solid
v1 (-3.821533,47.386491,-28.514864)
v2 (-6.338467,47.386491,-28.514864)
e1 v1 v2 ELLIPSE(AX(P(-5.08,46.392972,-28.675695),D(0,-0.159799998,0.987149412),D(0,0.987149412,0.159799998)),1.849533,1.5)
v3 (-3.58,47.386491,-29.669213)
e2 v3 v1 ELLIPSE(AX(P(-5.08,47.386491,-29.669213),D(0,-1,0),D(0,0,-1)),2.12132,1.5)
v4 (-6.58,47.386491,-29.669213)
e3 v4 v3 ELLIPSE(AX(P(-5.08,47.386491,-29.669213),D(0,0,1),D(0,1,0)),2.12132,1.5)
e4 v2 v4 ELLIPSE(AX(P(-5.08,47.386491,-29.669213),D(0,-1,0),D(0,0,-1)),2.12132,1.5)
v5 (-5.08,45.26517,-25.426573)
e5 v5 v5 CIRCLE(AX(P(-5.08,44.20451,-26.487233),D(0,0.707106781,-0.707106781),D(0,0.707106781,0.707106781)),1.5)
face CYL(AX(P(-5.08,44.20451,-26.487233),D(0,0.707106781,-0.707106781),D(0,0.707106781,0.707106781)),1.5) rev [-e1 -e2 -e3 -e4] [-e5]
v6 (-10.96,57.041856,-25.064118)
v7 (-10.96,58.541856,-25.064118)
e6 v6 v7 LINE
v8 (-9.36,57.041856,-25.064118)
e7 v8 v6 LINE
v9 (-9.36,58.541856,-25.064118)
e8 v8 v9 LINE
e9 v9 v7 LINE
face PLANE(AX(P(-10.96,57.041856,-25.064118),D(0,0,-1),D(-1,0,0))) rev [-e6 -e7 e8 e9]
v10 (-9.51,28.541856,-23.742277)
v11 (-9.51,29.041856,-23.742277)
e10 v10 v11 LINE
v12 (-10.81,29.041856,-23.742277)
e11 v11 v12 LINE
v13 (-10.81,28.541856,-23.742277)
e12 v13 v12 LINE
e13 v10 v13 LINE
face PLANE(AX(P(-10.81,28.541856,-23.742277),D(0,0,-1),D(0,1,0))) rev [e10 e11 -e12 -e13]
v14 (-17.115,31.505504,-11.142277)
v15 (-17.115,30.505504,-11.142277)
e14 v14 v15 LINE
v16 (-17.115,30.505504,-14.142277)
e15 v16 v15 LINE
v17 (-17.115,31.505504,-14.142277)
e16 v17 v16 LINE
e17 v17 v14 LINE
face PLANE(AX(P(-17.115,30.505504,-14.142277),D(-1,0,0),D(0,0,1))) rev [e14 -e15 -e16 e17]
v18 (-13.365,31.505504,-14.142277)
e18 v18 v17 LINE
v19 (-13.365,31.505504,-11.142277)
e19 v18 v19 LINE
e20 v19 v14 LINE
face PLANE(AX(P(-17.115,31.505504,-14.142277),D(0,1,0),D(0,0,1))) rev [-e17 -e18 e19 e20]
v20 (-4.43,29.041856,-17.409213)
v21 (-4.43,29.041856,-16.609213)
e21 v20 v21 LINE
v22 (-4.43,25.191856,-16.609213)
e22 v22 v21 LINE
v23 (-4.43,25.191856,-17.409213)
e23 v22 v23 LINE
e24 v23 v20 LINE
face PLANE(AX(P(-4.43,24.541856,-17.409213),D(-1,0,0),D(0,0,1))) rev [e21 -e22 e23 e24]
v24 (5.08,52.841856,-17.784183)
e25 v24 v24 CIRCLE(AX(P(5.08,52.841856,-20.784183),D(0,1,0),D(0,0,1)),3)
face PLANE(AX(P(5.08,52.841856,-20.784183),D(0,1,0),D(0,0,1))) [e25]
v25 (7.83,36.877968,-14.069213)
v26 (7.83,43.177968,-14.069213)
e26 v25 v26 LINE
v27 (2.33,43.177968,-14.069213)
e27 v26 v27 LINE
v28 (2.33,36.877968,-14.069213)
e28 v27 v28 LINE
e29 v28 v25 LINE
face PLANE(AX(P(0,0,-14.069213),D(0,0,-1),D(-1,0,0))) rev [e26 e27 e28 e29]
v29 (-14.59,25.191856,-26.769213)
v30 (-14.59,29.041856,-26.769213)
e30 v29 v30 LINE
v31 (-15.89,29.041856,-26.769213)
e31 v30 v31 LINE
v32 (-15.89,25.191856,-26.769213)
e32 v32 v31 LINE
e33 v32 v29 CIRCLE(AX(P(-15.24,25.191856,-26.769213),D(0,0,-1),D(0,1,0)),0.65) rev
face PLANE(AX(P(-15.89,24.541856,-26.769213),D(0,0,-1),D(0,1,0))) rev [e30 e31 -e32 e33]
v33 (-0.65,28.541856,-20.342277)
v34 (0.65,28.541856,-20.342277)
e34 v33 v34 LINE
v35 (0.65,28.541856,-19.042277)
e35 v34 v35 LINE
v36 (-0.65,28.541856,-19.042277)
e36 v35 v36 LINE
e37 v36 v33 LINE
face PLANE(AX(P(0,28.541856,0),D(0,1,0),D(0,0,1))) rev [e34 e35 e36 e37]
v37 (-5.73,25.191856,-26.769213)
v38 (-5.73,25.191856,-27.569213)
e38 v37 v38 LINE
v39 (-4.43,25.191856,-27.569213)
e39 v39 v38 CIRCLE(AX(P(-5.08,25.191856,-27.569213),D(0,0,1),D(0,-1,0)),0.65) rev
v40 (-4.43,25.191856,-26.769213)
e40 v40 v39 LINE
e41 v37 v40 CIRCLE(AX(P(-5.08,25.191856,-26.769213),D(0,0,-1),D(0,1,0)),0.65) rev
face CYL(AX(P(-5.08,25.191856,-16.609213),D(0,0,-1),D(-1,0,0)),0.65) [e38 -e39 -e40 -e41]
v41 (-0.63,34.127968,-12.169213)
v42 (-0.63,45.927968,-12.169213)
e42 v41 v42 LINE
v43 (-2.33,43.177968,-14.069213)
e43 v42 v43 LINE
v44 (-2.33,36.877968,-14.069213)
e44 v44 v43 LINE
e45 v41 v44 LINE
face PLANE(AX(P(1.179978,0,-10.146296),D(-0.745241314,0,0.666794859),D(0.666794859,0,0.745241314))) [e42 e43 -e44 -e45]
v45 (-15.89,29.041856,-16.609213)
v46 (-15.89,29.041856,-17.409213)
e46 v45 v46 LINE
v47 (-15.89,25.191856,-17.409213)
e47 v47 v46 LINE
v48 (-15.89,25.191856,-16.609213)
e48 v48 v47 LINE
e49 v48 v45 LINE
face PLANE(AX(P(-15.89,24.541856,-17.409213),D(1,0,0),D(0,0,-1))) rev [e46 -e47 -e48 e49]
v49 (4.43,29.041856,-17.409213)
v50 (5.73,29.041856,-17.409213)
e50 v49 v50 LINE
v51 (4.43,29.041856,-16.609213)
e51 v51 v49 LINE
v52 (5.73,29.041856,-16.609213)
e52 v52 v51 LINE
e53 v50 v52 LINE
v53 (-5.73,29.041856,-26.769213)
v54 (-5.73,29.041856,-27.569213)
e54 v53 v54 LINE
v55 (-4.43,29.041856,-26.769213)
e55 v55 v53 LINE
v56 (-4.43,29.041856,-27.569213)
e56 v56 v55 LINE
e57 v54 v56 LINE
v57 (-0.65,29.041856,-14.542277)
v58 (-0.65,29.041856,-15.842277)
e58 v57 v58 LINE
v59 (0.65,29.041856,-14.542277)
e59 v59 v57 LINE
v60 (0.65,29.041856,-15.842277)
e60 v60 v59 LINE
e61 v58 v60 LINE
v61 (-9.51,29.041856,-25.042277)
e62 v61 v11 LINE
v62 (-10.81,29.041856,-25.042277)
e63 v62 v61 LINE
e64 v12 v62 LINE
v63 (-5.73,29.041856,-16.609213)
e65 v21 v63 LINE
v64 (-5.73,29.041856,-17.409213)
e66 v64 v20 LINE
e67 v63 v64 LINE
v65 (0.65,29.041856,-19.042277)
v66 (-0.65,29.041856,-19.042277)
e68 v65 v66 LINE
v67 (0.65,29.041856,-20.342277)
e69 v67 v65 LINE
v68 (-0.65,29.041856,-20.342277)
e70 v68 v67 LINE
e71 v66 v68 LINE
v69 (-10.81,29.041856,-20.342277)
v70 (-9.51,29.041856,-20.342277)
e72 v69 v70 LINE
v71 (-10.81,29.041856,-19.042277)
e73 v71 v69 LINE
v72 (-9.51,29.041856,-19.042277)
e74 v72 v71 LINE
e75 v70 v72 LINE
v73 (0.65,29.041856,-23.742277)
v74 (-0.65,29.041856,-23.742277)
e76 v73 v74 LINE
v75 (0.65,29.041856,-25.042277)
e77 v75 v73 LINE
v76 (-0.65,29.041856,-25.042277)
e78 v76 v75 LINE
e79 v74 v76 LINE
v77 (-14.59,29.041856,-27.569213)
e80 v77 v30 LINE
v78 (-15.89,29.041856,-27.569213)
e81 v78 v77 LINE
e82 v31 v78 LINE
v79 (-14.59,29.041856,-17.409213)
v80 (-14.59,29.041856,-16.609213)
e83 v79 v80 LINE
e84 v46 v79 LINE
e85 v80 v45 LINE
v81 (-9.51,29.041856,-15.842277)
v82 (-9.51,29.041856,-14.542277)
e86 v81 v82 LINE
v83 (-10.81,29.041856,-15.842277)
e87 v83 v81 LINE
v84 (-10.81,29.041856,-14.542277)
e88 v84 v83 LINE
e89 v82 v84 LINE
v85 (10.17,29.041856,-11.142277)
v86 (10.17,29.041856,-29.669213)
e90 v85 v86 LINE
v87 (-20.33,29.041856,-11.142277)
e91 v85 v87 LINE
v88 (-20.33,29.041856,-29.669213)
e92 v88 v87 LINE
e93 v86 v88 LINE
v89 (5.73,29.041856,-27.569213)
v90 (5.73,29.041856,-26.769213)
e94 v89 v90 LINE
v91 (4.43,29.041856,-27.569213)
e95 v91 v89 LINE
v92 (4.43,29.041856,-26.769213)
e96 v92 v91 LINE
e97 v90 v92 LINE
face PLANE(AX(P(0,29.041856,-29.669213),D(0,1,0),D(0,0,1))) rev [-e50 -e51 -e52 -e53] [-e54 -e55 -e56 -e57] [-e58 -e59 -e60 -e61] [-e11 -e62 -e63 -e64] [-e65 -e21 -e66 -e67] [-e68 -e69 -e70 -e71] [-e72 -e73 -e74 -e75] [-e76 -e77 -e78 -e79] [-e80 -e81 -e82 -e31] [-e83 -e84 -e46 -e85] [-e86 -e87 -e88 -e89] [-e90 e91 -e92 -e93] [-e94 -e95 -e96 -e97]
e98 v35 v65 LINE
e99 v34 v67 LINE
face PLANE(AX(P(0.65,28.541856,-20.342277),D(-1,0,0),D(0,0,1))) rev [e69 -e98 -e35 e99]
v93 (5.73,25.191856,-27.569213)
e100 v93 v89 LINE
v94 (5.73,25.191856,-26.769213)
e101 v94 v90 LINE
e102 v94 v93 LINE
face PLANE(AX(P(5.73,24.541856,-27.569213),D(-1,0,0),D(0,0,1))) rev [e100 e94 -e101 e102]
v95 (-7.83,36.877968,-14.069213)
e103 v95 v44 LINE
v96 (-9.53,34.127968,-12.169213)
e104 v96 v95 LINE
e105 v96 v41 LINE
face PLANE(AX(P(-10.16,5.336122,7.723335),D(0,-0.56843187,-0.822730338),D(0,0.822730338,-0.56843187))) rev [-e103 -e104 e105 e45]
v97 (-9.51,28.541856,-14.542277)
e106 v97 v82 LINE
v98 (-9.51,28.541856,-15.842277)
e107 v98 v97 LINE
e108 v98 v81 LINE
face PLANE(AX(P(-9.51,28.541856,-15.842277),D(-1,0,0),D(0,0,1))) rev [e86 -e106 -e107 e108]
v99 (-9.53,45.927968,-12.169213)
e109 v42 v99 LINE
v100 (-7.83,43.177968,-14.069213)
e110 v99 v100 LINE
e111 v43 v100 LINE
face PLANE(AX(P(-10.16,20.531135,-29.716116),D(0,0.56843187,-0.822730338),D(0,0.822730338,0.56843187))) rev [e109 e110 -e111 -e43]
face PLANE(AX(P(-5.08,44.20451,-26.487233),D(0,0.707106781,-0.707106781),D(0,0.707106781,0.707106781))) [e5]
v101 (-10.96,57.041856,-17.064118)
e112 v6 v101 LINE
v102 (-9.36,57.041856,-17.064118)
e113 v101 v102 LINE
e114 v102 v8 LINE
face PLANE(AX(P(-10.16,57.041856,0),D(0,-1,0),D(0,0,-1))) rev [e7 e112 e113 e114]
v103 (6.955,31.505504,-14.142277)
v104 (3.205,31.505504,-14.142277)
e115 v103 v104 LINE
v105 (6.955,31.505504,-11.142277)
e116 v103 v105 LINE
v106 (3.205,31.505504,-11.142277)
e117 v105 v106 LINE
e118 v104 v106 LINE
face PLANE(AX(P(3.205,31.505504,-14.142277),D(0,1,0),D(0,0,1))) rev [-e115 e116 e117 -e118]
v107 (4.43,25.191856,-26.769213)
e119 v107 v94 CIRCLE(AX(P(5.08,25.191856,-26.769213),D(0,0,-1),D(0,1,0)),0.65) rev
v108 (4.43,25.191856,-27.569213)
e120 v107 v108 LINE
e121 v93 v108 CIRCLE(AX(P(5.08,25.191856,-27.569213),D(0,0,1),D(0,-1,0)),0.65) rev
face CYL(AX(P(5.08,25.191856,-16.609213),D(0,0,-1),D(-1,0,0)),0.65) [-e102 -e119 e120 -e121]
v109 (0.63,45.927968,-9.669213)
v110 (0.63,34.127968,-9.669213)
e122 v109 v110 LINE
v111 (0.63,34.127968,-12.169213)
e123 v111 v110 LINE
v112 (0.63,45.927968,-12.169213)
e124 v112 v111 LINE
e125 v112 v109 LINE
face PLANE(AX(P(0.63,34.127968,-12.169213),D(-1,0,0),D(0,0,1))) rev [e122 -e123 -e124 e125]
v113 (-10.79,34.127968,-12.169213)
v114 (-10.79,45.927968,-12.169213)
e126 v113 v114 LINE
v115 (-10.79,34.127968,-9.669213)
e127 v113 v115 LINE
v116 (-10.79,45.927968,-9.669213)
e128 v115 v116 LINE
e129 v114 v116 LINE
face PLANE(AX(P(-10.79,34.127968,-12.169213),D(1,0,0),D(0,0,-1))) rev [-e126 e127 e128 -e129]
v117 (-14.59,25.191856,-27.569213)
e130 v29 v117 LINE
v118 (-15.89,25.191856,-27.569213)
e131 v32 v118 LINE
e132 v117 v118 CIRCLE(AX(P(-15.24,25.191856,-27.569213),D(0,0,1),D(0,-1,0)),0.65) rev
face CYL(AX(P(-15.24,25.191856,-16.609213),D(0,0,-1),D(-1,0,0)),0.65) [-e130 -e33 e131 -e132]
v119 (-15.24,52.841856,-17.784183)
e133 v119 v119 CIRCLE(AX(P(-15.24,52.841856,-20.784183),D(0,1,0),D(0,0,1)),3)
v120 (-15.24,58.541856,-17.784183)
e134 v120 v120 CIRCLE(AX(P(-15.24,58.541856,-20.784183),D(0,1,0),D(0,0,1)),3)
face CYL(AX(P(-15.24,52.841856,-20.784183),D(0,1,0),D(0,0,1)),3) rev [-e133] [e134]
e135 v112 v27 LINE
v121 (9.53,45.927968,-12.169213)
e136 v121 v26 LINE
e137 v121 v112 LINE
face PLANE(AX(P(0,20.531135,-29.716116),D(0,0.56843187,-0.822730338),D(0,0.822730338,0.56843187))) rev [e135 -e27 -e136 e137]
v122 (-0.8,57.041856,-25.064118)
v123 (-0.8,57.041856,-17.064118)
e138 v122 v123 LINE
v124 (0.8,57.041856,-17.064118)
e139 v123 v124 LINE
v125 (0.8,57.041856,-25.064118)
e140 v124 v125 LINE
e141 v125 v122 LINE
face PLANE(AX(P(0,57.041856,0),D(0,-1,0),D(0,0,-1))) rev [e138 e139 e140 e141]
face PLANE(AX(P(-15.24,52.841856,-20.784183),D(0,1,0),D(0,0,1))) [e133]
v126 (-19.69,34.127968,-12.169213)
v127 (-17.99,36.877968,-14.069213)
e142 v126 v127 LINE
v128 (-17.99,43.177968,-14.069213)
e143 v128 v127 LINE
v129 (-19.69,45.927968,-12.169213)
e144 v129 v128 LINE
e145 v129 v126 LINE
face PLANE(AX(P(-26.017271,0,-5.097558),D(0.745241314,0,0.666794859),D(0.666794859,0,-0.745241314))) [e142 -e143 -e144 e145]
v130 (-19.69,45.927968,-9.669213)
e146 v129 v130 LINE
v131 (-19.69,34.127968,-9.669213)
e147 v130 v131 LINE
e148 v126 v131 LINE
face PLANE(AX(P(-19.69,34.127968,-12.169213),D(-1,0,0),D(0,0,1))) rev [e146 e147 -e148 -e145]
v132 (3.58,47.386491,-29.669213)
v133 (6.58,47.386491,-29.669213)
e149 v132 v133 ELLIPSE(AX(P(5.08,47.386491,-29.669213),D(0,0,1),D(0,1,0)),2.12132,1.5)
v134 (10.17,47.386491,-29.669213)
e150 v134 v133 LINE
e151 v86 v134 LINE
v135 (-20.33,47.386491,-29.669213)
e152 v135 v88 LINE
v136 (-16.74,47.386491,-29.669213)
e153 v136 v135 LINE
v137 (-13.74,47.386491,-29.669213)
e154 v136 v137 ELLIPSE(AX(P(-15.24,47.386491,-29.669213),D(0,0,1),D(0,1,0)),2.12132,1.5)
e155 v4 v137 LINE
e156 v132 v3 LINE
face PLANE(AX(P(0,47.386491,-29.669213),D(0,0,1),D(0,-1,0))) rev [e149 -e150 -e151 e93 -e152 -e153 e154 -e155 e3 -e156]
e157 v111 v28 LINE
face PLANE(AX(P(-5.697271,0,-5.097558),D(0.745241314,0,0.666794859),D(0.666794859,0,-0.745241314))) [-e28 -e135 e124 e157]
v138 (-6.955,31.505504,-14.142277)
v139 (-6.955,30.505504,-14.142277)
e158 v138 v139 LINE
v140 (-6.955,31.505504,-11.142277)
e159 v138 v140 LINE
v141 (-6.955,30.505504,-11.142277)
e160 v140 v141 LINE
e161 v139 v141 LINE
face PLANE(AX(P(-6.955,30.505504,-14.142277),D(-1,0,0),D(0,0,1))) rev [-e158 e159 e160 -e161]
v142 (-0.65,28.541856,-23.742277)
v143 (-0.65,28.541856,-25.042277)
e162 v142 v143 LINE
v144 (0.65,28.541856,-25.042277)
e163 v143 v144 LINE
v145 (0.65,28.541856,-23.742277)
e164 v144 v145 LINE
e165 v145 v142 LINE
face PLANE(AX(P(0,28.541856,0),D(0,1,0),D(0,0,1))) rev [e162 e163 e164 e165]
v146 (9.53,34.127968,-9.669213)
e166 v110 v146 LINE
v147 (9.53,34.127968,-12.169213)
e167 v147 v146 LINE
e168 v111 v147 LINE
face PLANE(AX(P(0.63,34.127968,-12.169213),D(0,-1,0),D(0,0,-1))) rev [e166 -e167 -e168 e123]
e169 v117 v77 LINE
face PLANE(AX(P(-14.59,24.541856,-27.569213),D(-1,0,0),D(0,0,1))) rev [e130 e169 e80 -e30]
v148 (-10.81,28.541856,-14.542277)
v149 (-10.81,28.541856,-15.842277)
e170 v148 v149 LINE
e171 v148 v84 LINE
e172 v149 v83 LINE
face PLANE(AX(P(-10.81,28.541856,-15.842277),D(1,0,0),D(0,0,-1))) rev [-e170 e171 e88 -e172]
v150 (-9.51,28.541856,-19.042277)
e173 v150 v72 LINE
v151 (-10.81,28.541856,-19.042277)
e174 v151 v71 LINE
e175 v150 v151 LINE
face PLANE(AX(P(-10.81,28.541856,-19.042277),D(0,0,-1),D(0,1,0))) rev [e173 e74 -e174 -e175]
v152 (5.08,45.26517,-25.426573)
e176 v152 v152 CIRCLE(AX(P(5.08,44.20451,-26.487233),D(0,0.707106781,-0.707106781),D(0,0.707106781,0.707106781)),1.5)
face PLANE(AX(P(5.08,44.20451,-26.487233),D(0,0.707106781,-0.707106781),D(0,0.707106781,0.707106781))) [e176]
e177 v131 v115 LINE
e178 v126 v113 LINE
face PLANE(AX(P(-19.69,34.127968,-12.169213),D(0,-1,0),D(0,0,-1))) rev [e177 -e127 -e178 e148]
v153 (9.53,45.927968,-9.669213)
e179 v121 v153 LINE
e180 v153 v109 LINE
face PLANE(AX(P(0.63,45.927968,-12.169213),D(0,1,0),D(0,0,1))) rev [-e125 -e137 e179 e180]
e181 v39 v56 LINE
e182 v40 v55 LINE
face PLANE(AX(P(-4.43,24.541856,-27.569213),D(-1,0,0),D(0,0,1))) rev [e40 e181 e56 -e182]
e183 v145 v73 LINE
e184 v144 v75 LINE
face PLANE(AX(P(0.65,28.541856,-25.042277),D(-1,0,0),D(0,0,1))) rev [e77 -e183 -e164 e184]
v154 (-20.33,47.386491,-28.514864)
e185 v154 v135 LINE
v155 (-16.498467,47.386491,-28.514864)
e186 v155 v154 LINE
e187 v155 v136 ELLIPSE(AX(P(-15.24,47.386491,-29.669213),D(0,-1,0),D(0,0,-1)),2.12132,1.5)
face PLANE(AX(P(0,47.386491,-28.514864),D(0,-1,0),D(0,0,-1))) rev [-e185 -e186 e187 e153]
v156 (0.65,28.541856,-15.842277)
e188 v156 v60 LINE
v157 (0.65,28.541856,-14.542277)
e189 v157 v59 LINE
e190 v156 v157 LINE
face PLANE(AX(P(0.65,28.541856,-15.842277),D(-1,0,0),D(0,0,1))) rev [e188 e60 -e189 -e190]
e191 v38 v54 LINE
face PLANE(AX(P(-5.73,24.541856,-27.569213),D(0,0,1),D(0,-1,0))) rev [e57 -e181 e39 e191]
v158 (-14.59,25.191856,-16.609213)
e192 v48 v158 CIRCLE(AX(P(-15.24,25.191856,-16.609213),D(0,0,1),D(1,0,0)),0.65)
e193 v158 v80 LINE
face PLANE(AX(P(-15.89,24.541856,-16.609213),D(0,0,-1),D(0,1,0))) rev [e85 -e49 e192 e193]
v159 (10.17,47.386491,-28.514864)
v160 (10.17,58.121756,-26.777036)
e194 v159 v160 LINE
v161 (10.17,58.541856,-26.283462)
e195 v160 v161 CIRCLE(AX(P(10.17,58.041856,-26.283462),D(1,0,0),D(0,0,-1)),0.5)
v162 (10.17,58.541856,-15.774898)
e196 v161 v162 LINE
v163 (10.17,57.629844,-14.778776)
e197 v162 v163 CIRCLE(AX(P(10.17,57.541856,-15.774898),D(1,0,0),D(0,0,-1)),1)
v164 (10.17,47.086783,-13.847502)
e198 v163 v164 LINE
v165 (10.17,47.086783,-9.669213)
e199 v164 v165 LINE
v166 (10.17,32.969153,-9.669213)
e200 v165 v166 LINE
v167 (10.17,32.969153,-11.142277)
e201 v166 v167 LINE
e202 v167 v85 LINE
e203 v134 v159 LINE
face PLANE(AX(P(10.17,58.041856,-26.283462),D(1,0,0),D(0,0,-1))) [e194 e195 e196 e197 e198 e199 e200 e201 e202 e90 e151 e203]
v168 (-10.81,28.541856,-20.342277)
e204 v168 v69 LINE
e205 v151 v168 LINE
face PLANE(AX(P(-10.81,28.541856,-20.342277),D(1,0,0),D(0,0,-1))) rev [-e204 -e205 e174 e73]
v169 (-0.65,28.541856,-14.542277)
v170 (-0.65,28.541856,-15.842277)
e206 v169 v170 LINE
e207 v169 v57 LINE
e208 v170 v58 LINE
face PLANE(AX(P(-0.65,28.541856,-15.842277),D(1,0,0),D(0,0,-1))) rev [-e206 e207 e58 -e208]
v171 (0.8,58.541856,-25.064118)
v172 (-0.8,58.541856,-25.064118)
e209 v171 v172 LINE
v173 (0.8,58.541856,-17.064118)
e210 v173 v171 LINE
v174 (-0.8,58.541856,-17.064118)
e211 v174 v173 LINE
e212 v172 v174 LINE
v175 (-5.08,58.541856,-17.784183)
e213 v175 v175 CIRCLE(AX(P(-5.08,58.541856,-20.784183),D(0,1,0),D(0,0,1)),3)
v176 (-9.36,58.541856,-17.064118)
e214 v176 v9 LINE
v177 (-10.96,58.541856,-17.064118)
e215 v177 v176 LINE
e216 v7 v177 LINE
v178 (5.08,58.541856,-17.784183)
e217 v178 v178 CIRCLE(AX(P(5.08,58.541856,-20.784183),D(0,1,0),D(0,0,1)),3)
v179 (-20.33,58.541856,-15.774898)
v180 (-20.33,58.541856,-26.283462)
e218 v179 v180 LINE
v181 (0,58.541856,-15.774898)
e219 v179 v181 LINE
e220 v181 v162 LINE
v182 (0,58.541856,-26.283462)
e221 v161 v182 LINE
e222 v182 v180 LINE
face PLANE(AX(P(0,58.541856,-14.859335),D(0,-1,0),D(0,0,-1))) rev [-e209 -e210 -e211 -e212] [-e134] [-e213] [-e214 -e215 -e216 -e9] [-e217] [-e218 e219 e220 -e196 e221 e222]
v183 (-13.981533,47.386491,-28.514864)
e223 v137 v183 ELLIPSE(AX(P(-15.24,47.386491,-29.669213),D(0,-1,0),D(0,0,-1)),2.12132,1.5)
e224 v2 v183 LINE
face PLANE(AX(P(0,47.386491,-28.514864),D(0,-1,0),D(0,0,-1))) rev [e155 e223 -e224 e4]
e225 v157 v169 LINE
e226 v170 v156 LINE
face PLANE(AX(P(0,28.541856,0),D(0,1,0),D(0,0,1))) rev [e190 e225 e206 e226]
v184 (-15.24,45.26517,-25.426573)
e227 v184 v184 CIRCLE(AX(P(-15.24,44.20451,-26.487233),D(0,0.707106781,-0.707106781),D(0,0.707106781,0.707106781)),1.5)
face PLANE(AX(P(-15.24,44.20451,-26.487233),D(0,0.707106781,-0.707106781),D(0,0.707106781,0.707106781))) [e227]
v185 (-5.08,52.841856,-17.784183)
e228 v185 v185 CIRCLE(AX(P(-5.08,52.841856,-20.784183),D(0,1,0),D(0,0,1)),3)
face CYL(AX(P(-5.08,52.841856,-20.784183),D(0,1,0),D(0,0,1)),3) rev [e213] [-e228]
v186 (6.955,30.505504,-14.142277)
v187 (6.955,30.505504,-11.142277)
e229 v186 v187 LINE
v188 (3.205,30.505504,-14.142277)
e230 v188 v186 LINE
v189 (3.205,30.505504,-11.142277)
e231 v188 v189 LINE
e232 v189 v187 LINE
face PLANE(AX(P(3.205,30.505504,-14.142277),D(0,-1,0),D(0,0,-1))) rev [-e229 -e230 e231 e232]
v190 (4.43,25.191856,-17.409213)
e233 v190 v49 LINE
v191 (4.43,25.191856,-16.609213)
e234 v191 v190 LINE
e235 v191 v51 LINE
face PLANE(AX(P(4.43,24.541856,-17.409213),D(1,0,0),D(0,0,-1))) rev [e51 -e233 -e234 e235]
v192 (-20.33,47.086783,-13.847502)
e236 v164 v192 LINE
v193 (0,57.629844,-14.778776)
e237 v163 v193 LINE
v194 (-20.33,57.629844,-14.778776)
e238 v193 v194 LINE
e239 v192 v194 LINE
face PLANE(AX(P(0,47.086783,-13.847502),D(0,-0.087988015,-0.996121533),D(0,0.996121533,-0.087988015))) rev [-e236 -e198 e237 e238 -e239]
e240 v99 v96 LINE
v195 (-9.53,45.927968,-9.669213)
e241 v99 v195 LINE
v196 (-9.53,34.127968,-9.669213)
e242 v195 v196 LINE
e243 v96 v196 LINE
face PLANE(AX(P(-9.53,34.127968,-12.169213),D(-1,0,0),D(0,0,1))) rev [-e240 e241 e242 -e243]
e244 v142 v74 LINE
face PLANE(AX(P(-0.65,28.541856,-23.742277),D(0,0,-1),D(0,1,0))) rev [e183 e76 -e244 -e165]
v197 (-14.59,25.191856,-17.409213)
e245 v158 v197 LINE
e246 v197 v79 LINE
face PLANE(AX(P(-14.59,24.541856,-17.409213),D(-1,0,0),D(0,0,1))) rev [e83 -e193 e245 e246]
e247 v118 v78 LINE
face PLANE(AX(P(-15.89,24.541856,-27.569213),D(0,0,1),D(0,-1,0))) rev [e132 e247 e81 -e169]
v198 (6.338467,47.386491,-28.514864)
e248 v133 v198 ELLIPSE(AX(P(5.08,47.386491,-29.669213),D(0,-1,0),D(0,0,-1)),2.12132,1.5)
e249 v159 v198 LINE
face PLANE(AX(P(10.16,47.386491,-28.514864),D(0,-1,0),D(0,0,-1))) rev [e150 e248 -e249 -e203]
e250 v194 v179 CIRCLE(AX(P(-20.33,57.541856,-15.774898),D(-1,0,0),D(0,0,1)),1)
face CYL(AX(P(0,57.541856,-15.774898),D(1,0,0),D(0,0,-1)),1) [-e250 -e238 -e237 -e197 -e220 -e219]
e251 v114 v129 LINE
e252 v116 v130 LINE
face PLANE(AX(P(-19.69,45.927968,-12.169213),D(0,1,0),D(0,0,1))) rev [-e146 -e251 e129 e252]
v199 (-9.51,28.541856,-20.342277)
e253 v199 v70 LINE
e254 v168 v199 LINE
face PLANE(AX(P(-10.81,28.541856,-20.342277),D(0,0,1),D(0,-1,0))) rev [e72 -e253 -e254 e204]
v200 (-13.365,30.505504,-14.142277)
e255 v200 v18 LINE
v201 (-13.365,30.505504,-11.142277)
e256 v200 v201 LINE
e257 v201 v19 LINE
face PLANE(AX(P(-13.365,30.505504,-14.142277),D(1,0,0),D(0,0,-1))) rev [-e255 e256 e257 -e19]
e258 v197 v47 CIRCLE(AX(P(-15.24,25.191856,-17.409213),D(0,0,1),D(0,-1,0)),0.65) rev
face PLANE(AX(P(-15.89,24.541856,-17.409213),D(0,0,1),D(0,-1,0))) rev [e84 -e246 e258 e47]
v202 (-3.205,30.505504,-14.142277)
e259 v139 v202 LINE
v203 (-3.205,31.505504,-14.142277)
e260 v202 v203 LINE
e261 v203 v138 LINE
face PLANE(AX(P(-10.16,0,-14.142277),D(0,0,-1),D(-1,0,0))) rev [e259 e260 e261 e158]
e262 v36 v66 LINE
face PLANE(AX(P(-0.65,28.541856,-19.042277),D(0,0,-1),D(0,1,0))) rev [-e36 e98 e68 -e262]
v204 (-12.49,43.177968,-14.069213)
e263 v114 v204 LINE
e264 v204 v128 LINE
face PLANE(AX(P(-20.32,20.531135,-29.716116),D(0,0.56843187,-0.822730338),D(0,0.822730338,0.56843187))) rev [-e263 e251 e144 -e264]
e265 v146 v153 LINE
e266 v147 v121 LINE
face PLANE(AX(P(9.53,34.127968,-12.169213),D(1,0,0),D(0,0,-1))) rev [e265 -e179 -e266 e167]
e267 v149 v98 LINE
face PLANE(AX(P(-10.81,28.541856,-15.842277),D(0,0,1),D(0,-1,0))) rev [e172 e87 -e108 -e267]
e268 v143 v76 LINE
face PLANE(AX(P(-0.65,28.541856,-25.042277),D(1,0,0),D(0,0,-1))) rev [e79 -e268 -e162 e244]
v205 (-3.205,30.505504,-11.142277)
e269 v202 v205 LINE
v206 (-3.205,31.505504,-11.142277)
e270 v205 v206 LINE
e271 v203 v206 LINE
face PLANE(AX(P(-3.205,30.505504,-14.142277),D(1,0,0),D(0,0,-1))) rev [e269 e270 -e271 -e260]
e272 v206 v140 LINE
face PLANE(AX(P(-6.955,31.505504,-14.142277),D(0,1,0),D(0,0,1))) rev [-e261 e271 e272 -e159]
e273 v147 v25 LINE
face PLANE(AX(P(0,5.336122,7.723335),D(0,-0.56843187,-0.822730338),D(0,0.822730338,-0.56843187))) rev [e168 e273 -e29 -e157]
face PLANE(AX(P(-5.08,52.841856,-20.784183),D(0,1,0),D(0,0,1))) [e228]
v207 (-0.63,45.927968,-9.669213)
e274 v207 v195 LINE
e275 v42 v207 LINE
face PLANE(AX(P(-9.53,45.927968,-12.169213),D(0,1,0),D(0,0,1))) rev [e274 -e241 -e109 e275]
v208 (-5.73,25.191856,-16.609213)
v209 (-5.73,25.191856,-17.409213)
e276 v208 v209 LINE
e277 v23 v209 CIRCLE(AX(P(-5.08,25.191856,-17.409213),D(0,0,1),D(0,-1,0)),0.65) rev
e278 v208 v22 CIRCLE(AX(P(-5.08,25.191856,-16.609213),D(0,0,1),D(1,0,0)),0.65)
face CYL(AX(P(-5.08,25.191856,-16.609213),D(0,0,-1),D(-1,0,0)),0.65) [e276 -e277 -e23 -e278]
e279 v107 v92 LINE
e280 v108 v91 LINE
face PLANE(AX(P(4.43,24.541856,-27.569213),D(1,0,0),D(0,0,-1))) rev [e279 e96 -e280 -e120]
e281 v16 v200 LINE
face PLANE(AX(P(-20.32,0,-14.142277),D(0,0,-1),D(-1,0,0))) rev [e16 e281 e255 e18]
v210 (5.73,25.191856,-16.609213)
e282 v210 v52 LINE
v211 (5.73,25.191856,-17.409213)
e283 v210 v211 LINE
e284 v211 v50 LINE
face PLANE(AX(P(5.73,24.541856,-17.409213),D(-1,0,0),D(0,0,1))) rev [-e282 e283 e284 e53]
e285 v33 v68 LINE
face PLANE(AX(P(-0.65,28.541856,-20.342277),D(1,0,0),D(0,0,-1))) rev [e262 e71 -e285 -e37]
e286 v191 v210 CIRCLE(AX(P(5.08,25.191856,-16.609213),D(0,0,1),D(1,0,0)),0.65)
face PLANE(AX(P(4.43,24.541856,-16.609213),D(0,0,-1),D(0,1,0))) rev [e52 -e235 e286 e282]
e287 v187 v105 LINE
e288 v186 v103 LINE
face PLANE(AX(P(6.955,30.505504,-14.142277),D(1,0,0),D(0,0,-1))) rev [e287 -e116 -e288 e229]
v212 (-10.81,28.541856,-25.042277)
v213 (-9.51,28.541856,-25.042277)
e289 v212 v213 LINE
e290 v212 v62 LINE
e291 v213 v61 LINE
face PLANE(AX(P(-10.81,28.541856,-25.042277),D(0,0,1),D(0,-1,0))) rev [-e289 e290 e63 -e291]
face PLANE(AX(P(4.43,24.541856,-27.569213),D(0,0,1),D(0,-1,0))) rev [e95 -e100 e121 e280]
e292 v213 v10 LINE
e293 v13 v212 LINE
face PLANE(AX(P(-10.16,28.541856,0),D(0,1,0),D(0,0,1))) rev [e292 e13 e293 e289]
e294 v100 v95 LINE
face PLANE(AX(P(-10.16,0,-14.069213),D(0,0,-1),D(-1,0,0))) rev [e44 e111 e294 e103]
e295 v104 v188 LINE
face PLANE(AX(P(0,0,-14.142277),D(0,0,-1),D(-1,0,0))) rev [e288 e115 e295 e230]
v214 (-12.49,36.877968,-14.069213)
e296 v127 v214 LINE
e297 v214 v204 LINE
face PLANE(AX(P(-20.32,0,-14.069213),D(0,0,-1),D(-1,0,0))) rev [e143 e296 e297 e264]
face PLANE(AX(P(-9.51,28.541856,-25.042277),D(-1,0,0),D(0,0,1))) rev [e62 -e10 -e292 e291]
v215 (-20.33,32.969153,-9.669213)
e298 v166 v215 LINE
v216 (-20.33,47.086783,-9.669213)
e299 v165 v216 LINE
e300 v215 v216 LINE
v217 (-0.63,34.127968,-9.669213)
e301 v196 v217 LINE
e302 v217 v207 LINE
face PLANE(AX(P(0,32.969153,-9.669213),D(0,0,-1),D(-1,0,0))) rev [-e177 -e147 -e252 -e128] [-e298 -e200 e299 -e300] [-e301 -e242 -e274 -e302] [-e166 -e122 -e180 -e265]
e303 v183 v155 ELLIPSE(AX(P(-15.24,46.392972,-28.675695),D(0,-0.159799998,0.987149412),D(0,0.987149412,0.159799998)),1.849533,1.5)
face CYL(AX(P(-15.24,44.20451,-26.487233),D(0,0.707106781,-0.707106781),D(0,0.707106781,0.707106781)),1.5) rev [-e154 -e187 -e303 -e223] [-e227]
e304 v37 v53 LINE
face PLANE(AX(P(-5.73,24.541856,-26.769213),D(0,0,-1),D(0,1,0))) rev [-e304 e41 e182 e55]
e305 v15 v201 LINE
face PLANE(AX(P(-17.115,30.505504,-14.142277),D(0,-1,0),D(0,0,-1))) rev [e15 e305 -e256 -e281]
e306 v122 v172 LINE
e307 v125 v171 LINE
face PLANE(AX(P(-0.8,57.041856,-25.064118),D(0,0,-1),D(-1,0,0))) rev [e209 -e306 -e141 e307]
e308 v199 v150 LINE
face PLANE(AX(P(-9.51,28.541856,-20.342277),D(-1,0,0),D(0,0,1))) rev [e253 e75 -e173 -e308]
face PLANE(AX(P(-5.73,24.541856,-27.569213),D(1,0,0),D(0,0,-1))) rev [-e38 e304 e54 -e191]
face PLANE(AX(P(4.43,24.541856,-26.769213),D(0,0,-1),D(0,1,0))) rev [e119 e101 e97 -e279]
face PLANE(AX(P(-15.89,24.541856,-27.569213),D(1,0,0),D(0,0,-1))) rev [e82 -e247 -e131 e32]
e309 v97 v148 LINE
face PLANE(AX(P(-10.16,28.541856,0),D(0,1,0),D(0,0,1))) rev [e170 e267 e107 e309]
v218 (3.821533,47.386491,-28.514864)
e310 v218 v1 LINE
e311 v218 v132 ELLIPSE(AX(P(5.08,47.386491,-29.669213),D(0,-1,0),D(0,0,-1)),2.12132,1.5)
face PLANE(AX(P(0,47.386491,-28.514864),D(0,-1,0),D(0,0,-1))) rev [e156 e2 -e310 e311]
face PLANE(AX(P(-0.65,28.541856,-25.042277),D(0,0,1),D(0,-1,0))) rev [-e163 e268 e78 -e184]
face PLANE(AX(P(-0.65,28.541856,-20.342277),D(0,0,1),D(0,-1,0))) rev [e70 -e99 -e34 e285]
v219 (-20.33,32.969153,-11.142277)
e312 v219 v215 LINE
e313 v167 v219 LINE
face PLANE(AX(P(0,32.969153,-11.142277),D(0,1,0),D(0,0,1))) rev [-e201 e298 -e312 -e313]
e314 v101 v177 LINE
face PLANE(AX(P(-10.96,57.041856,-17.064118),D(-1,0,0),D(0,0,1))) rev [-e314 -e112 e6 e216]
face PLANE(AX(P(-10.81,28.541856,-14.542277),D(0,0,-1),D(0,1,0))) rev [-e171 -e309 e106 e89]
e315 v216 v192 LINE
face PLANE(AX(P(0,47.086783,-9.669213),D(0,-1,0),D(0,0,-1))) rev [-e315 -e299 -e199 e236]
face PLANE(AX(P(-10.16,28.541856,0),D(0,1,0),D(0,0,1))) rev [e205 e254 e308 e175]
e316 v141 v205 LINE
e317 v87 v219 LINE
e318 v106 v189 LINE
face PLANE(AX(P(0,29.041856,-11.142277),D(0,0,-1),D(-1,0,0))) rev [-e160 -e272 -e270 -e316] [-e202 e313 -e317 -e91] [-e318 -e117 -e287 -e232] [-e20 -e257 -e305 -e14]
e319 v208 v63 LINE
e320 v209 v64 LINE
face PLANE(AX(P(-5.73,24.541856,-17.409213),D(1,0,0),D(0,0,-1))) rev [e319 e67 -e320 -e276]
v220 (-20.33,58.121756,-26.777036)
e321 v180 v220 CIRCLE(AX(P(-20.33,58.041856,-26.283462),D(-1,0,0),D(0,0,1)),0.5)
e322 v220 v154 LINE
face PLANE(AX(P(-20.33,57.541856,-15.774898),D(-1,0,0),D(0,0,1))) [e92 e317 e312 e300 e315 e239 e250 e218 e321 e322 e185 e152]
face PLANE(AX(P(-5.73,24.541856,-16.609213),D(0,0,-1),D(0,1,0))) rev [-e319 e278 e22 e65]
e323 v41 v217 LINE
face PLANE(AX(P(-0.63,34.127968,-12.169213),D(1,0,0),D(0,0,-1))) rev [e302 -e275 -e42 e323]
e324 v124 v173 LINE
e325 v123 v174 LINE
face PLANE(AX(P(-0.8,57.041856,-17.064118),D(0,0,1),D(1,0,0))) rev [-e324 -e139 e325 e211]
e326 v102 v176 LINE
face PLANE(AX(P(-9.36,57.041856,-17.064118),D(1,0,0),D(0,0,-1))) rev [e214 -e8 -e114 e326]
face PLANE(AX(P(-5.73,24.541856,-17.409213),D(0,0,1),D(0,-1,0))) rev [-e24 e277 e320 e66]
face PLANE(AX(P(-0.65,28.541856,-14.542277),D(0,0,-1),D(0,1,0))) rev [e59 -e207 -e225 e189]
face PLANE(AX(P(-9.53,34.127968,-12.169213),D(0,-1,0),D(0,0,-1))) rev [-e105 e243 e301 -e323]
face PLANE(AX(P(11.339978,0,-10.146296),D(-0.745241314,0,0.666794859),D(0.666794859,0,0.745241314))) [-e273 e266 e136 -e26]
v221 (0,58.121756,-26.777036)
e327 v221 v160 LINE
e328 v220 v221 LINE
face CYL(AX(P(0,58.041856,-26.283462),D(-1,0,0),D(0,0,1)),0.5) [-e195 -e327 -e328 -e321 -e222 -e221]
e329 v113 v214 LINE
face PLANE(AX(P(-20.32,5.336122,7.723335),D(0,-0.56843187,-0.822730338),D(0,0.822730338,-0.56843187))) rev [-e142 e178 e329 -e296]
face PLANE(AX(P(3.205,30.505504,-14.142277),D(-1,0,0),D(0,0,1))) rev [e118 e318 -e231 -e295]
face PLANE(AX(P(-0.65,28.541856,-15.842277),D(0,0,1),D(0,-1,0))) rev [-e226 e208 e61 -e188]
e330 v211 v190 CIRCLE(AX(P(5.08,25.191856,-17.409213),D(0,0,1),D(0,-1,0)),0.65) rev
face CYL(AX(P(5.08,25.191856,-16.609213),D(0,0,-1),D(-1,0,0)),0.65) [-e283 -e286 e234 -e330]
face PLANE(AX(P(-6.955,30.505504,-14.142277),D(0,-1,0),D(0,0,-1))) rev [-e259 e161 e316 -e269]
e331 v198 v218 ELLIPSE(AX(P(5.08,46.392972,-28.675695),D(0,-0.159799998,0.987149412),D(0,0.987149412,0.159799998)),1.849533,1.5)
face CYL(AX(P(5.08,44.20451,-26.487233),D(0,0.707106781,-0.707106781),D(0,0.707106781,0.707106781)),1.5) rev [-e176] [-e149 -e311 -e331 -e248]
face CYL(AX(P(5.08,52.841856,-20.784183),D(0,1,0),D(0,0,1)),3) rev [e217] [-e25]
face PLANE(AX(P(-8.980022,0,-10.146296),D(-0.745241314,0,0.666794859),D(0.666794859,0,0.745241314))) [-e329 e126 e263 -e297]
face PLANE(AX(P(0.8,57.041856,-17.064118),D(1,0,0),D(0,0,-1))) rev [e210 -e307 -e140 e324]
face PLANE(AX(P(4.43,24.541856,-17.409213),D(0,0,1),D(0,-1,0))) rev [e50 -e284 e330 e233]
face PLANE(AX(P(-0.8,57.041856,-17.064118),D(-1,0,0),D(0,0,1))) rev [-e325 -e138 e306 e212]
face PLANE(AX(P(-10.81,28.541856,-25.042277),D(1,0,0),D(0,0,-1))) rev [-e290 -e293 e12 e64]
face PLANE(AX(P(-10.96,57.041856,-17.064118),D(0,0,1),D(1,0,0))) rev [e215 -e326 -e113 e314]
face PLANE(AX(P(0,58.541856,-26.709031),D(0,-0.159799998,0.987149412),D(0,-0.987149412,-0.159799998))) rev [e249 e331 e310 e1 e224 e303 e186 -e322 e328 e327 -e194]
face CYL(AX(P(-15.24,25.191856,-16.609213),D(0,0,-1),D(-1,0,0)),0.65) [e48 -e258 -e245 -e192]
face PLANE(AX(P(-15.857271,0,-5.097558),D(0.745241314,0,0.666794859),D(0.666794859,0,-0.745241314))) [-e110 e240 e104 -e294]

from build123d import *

# Parameters (mm, degrees)
BOSS_EXTRUDE1_DEPTH    = 10.16
SKETCH2_W              = 8.900000000000002
SKETCH2_H              = 11.800000000000011
CUT_EXTRUDE1_DEPTH     = 2.5
SKETCH5_R              = 2.9999999999999996
CUT_EXTRUDE2_DEPTH     = 5.7
SKETCH7_W              = 1.2999999999999998
SKETCH7_H              = 0.8000000000000007
SKETCH7_H_2            = 0.7999999999999936
BOSS_EXTRUDE2_DEPTH    = 4.5
CUT_EXTRUDE5_START     = -10.96
CUT_EXTRUDE5_DEPTH     = 10.96
SKETCH10_R             = 1.4999999999999998
CUT_EXTRUDE6_DEPTH     = 4.5
SKETCH13_W             = 3.75
SKETCH13_H             = 1
CUT_EXTRUDE8_DEPTH     = 3
FILLET3_R              = 0.5
FILLET4_R              = 1
SKETCH12_W             = 1.2999999999999998
SKETCH12_H             = 1.299999999999999
BOSS_EXTRUDE3_DEPTH    = 0.5
BOSS_EXTRUDE3_2_DEPTH  = 0.5
BOSS_EXTRUDE3_3_DEPTH  = 0.5
BOSS_EXTRUDE4_START    = 0.01
BOSS_EXTRUDE4_DEPTH    = 0.01
LPATTERN8_COUNT        = 3
LPATTERN8_PITCH        = 10.16
LPATTERN8_2_COUNT      = 3
LPATTERN8_2_PITCH      = 10.16
LPATTERN8_3_COUNT      = 3
LPATTERN8_3_PITCH      = 10.16
LPATTERN8_4_COUNT      = 3
LPATTERN8_4_PITCH      = 10.16
FILLET3_OF_LPATTERN8_R = 0.5
FILLET4_OF_LPATTERN8_R = 1
SKETCH11_W             = 1.6
SKETCH11_H             = 8
CUT_EXTRUDE7_DEPTH     = 1.5
LPATTERN9_COUNT        = 2
LPATTERN9_PITCH        = 10.16
BOSS_EXTRUDE6_DEPTH    = 0.01


# Read off the part's stored shape, not the designer's step: Cut-Extrude5
with BuildPart() as part:
    # Sketch1 → Boss-Extrude1 (new body)
    with BuildSketch(Plane(origin=(0, 0, 0), x_dir=(0, 0, -1), z_dir=(1, 0, 0))):
        Polygon((9.669213470381848, 32.96915259715871), (9.669213470381848, 47.08678337249189), (13.847501539912686, 47.08678337249189), (14.859335014289963, 58.54185616450892), (26.70903057031256, 58.54185616450892), (28.514863984729242, 47.38649061080074), (29.669213470381848, 47.38649061080074), (29.66921347038185, 29.041856164508925), (11.142277404209432, 29.04185616450892), (11.142277404209432, 32.96915259715871), align=None)
    boss_extrude1 = extrude(amount=BOSS_EXTRUDE1_DEPTH)

    # Sketch2 → Cut-Extrude1 (cut)
    with BuildSketch(Plane.XY.offset(-9.669213470381848)):
        with Locations((5.08, 40.0279679848253)):
            Rectangle(SKETCH2_W, SKETCH2_H)
    cut_extrude1 = extrude(amount=-CUT_EXTRUDE1_DEPTH, mode=Mode.SUBTRACT)

    # Sketch3 → Cut-Loft1 section 0
    with BuildSketch(Plane.XY.offset(-12.169213470381848)):
        with BuildLine():
            Line((9.530000000000001, 34.1279679848253), (9.530000000000001, 45.92796798482531))
            Line((9.530000000000001, 45.92796798482531), (0.6299999999999994, 45.92796798482531))
            Line((0.6299999999999994, 45.92796798482531), (0.6299999999999994, 34.1279679848253))
            Line((0.6299999999999994, 34.1279679848253), (9.530000000000001, 34.1279679848253))
        make_face()
    # Sketch4 → Cut-Loft1 section 1
    with BuildSketch(Plane.XY.offset(-14.069213470381849)):
        with BuildLine():
            Line((2.3299999999999987, 36.877967984825304), (7.829999999999998, 36.877967984825304))
            Line((7.829999999999998, 36.877967984825304), (7.829999999999998, 43.1779679848253))
            Line((7.829999999999998, 43.1779679848253), (2.3299999999999987, 43.1779679848253))
            Line((2.3299999999999987, 43.1779679848253), (2.3299999999999987, 36.877967984825304))
        make_face()
    cut_loft1 = loft(mode=Mode.SUBTRACT)

    # Sketch5 → Cut-Extrude2 (cut)
    with BuildSketch(Plane(origin=(0, 58.54185616450892, 0), x_dir=(1, 0, 0), z_dir=(0, 1, 0))):
        with Locations(Location((5.08, 20.784182792301262, 0), (0, 0, 270))):
            Circle(SKETCH5_R)
    cut_extrude2 = extrude(amount=-CUT_EXTRUDE2_DEPTH, mode=Mode.SUBTRACT)

    # Sketch7 → Boss-Extrude2 (add)
    with BuildSketch(Plane.XZ.offset(-29.041856164508918)):
        with Locations((5.08, -27.169213470381862)):
            Rectangle(SKETCH7_W, SKETCH7_H)
        with Locations((5.08, -17.00921347038186)):
            Rectangle(SKETCH7_W, SKETCH7_H_2)
    boss_extrude2 = extrude(amount=BOSS_EXTRUDE2_DEPTH)

    # Cut-Extrude5 outline → Cut-Extrude5 (cut)
    with BuildSketch(Plane.XY.offset(-16.60921347038186).offset(CUT_EXTRUDE5_START)):
        with BuildLine():
            Line((5.73, 24.541856165), (5.73, 25.191856165))
            ThreePointArc((5.73, 25.191856165), (5.539619408, 24.732236757), (5.08, 24.541856165))
            Line((5.08, 24.541856165), (5.73, 24.541856165))
        make_face()
        with BuildLine():
            Line((4.43, 24.541856165), (5.08, 24.541856165))
            ThreePointArc((5.08, 24.541856165), (4.620380592, 24.732236757), (4.43, 25.191856165))
            Line((4.43, 25.191856165), (4.43, 24.541856165))
        make_face()
    cut_extrude5 = extrude(amount=CUT_EXTRUDE5_DEPTH, mode=Mode.SUBTRACT)

    # Sketch10 → Cut-Extrude6 (cut)
    with BuildSketch(Plane(origin=(0, 38.527852040591384, -38.527852040591256), x_dir=(-1, 0, 0), z_dir=(0, 0.7071067811865488, -0.7071067811865464))):
        with Locations(Location((-5.08, 12.528006810151506, 0), (0, 0, 90))):
            Circle(SKETCH10_R)
    cut_extrude6 = extrude(amount=-CUT_EXTRUDE6_DEPTH, mode=Mode.SUBTRACT)

    # Sketch13 → Cut-Extrude8 (cut)
    with BuildSketch(Plane.XY.offset(-11.142277404209432)):
        with Locations((5.080000000000007, 31.005504380833823)):
            Rectangle(SKETCH13_W, SKETCH13_H)
    cut_extrude8 = extrude(amount=-CUT_EXTRUDE8_DEPTH, mode=Mode.SUBTRACT)

    # Fillet3
    fillet3_edges = [part.edges().sort_by_distance(p)[0] for p in [
        (5.08, 58.54185616450892, -26.70903057031256),
    ]]
    fillet(fillet3_edges, radius=FILLET3_R)

    # Fillet4
    fillet4_edges = [part.edges().sort_by_distance(p)[0] for p in [
        (5.08, 58.54185616450892, -14.859335014289963),
    ]]
    fillet(fillet4_edges, radius=FILLET4_R)

    # Sketch14 → Boss-Extrude4 (add)
    with BuildSketch(Plane(origin=(10.16, 0, 0), x_dir=(0, 0, -1), z_dir=(1, 0, 0)).offset(BOSS_EXTRUDE4_START)):
        with BuildLine():
            Line((14.77877644669124, 57.629844179105966), (13.847501539912686, 47.08678337249189))
            Line((13.847501539912686, 47.08678337249189), (9.669213470381848, 47.08678337249189))
            Line((9.669213470381848, 47.08678337249189), (9.669213470381848, 32.96915259715871))
            Line((9.669213470381848, 32.96915259715871), (11.142277404209432, 32.96915259715871))
            Line((11.142277404209432, 32.96915259715871), (11.142277404209432, 29.04185616450892))
            Line((11.142277404209432, 29.04185616450892), (29.66921347038185, 29.041856164508925))
            Line((29.66921347038185, 29.041856164508925), (29.669213470381848, 47.38649061080074))
            Line((29.669213470381848, 47.38649061080074), (28.514863984729242, 47.38649061080074))
            Line((28.514863984729242, 47.38649061080074), (26.777036465378647, 58.121756163471794))
            ThreePointArc((26.777036465378647, 58.121756163471794), (26.607537368480997, 58.42261199143836), (26.28346175961899, 58.54185616450892))
            Line((26.28346175961899, 58.54185616450892), (15.77489798008326, 58.54185616450892))
            ThreePointArc((15.77489798008326, 58.54185616450892), (15.09961582223998, 58.279415658582806), (14.77877644669124, 57.629844179105966))
        make_face()
    extrude(amount=-BOSS_EXTRUDE4_DEPTH)



with BuildPart() as body_2:
    # Sketch12 → Boss-Extrude3 (new body)
    with BuildSketch(Plane.XZ.offset(-29.041856164508918)):
        with Locations((3.9e-16, -15.192277404209438)):
            Rectangle(SKETCH12_W, SKETCH12_H)
    boss_extrude3 = extrude(amount=BOSS_EXTRUDE3_DEPTH)


with BuildPart() as body_3:
    # Sketch12 → Boss-Extrude3 2 (new body)
    with BuildSketch(Plane.XZ.offset(-29.041856164508918)):
        Polygon((-0.6500000000000012, -20.342277404209444), (0.6499999999999989, -20.342277404209444), (0.649999999999998, -19.04227740420944), (-0.6500000000000012, -19.04227740420944), align=None)
    boss_extrude3_2 = extrude(amount=BOSS_EXTRUDE3_2_DEPTH)


with BuildPart() as body_4:
    # Sketch12 → Boss-Extrude3 3 (new body)
    with BuildSketch(Plane.XZ.offset(-29.041856164508918)):
        Polygon((-0.6499999999999996, -25.042277404209447), (0.6500000000000006, -25.042277404209447), (0.6500000000000008, -23.742277404209442), (-0.6499999999999996, -23.742277404209442), align=None)
    boss_extrude3_3 = extrude(amount=BOSS_EXTRUDE3_3_DEPTH)


with BuildPart() as part_1:
    add(part.part)

    add(body_2.part)  # LPattern8 merges body 2

    add(body_3.part)  # LPattern8 merges body 3

    add(body_4.part)  # LPattern8 merges body 4
    # LPattern8: Boss-Extrude1 ×3
    with Locations(*[(-i * LPATTERN8_PITCH, 0, 0) for i in range(1, LPATTERN8_COUNT)]):
        add(boss_extrude1)

    # LPattern8 2: Cut-Extrude1, Cut-Loft1, Cut-Extrude2 ×3
    with Locations(*[(-i * LPATTERN8_2_PITCH, 0, 0) for i in range(1, LPATTERN8_2_COUNT)]):
        add(cut_extrude1, mode=Mode.SUBTRACT)
        add(cut_loft1, mode=Mode.SUBTRACT)
        add(cut_extrude2, mode=Mode.SUBTRACT)

    # LPattern8 3: Boss-Extrude2 ×3
    with Locations(*[(-i * LPATTERN8_3_PITCH, 0, 0) for i in range(1, LPATTERN8_3_COUNT)]):
        add(boss_extrude2)

    # LPattern8 4: Cut-Extrude5, Cut-Extrude6, Cut-Extrude8 ×3
    with Locations(*[(-i * LPATTERN8_4_PITCH, 0, 0) for i in range(1, LPATTERN8_4_COUNT)]):
        add(cut_extrude5, mode=Mode.SUBTRACT)
        add(cut_extrude6, mode=Mode.SUBTRACT)
        add(cut_extrude8, mode=Mode.SUBTRACT)

    # Fillet3 of LPattern8
    fillet3_of_lpattern8_edges = [part_1.edges().sort_by_distance(p)[0] for p in [
        (-5.08, 58.54185616450892, -26.70903057031256),
        (-15.24, 58.54185616450892, -26.70903057031256),
    ]]
    fillet(fillet3_of_lpattern8_edges, radius=FILLET3_OF_LPATTERN8_R)

    # Fillet4 of LPattern8
    fillet4_of_lpattern8_edges = [part_1.edges().sort_by_distance(p)[0] for p in [
        (-5.08, 58.54185616450892, -14.859335014289963),
        (-15.24, 58.54185616450892, -14.859335014289963),
    ]]
    fillet(fillet4_of_lpattern8_edges, radius=FILLET4_OF_LPATTERN8_R)

    # Sketch11 → Cut-Extrude7 (cut)
    with BuildSketch(Plane(origin=(0, 58.54185616450892, 0), x_dir=(1, 0, 0), z_dir=(0, 1, 0))):
        with Locations((4.16e-15, 21.064117563348077)):
            Rectangle(SKETCH11_W, SKETCH11_H)
    cut_extrude7 = extrude(amount=-CUT_EXTRUDE7_DEPTH, mode=Mode.SUBTRACT)

    # LPattern9: Boss-Extrude3, Boss-Extrude3 2, Boss-Extrude3 3, Cut-Extrude7 ×2
    with Locations(*[(-i * LPATTERN9_PITCH, 0, 0) for i in range(1, LPATTERN9_COUNT)]):
        add(boss_extrude3)
        add(boss_extrude3_2)
        add(boss_extrude3_3)
        add(cut_extrude7, mode=Mode.SUBTRACT)

    # Sketch16 → Boss-Extrude6 (add)
    with BuildSketch(Plane.ZY.offset(20.32)):
        with BuildLine():
            Line((-13.847501539912686, 47.08678337249189), (-14.77877644669124, 57.629844179105966))
            ThreePointArc((-14.77877644669124, 57.629844179105966), (-15.09961582223998, 58.279415658582806), (-15.77489798008326, 58.54185616450892))
            Line((-15.77489798008326, 58.54185616450892), (-26.28346175961899, 58.54185616450892))
            ThreePointArc((-26.28346175961899, 58.54185616450892), (-26.607537368480997, 58.42261199143836), (-26.777036465378647, 58.121756163471794))
            Line((-26.777036465378647, 58.121756163471794), (-28.514863984729242, 47.38649061080074))
            Line((-28.514863984729242, 47.38649061080074), (-29.669213470381848, 47.38649061080074))
            Line((-29.669213470381848, 47.38649061080074), (-29.66921347038185, 29.041856164508925))
            Line((-29.66921347038185, 29.041856164508925), (-11.142277404209432, 29.04185616450892))
            Line((-11.142277404209432, 29.04185616450892), (-11.142277404209432, 32.96915259715871))
            Line((-11.142277404209432, 32.96915259715871), (-9.669213470381848, 32.96915259715871))
            Line((-9.669213470381848, 32.96915259715871), (-9.669213470381848, 47.08678337249189))
            Line((-9.669213470381848, 47.08678337249189), (-13.847501539912686, 47.08678337249189))
        make_face()
    extrude(amount=BOSS_EXTRUDE6_DEPTH)


solid = part_1.part
